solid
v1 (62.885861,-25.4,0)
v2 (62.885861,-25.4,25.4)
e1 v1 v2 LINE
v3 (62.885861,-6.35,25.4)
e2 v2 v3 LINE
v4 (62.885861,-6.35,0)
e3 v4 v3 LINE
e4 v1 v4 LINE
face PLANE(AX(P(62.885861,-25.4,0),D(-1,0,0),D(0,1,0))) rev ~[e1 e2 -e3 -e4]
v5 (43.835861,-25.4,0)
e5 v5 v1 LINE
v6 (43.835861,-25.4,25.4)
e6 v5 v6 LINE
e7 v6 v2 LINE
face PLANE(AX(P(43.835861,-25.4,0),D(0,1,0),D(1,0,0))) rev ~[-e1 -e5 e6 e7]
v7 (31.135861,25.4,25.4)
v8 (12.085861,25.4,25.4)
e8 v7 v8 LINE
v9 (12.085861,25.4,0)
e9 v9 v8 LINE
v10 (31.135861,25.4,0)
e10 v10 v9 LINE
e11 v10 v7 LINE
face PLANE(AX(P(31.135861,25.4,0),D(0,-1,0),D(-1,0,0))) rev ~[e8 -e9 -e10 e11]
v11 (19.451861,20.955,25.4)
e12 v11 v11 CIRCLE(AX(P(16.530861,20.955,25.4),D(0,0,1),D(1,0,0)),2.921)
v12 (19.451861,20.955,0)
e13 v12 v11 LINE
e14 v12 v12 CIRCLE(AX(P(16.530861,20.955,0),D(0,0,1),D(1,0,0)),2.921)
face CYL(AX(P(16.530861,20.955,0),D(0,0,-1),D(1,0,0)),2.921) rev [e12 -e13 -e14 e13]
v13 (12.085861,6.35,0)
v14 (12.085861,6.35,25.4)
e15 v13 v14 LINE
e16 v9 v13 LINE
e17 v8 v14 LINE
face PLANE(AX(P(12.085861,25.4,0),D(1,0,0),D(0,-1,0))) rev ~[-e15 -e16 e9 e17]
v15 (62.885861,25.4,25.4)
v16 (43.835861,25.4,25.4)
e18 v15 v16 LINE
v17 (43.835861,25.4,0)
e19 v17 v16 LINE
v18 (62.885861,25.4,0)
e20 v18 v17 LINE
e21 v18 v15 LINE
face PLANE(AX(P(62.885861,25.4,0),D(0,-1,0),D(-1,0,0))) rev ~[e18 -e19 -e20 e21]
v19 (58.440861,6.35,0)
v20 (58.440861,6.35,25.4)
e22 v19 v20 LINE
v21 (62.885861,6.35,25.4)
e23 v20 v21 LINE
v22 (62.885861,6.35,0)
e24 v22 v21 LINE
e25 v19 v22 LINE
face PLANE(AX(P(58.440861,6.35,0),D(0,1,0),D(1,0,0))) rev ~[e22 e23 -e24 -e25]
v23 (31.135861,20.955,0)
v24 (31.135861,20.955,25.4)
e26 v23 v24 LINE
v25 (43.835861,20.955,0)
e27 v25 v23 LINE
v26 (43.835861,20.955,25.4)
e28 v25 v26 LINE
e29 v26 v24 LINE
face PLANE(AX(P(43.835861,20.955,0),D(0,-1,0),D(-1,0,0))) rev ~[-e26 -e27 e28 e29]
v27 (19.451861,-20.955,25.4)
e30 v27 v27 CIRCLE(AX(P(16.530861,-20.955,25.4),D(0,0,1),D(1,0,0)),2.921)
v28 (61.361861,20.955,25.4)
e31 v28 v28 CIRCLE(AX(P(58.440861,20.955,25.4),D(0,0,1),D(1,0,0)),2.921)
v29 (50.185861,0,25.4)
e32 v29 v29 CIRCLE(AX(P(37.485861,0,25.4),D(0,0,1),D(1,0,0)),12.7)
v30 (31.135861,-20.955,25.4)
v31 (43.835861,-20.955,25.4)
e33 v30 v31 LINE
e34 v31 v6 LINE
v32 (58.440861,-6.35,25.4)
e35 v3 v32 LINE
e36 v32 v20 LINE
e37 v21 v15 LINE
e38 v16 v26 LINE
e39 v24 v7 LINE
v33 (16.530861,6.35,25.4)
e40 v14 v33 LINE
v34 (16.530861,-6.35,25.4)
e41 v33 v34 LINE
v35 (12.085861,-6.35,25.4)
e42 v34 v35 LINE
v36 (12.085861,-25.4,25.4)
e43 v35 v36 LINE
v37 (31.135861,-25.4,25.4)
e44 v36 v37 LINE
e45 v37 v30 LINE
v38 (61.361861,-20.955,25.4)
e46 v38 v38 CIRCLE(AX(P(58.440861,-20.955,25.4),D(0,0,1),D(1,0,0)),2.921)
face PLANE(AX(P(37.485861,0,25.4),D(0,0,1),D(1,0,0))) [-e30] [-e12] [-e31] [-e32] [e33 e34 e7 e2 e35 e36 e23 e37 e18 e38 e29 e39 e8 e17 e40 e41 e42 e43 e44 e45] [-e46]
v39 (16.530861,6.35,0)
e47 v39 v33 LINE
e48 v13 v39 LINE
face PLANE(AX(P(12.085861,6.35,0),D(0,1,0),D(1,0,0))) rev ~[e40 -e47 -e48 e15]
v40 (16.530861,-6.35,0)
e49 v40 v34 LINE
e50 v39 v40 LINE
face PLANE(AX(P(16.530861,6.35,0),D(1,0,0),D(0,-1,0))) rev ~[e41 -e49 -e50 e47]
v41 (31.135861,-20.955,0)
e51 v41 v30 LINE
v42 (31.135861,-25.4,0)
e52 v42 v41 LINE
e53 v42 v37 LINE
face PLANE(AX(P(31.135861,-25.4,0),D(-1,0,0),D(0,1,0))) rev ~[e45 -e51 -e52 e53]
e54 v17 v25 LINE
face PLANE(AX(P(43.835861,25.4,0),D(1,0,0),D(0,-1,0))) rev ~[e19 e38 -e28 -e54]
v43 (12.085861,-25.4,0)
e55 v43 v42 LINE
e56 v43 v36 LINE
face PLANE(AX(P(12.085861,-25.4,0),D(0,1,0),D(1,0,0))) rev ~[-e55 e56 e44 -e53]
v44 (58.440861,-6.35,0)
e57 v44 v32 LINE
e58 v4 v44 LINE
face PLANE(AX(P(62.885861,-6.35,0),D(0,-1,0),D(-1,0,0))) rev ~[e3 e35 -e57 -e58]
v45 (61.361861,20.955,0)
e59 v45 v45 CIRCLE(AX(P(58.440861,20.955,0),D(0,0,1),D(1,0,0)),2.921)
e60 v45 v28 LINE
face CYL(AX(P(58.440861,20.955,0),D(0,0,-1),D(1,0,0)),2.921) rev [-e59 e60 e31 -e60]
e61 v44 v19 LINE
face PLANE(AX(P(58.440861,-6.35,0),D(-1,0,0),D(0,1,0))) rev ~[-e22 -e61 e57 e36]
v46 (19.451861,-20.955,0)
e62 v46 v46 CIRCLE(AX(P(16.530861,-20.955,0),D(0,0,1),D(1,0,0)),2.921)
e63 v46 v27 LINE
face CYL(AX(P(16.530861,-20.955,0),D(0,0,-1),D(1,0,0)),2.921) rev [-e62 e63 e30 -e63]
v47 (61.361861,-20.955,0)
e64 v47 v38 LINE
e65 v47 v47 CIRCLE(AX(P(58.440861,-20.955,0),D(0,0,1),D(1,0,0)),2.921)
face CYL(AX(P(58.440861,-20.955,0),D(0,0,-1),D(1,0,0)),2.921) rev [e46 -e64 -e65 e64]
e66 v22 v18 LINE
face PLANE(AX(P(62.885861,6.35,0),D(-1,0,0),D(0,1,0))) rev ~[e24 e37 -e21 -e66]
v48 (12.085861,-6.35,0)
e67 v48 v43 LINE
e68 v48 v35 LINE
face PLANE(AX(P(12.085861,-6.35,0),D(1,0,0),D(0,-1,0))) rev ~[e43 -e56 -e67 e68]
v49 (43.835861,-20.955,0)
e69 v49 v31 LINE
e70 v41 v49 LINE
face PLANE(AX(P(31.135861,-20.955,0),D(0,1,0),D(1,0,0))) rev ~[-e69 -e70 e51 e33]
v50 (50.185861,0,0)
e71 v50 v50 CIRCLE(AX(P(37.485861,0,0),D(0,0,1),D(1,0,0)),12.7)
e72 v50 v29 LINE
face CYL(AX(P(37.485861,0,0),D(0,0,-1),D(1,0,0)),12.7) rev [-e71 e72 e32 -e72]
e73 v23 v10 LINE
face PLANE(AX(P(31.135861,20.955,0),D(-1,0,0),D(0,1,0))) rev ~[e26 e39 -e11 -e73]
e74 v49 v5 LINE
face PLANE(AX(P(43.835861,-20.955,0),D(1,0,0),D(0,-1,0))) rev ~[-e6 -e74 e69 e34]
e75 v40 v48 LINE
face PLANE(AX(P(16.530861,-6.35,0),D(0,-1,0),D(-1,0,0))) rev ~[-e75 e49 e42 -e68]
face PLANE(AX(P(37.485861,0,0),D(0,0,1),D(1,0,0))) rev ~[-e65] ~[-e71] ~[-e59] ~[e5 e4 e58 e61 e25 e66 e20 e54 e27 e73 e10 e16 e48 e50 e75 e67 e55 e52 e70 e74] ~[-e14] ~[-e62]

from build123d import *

# Parameters (mm, degrees)
F0_R     = 2.921
F0_R_2   = 12.7
F1_DEPTH = 25.4


# Not quite as in the source:
# - the program builds the solid bodies; features that only make, move or delete a surface that nothing else refers to are left out


with BuildPart() as f1:
    # F0 (on Top) → F1 (new body)
    with BuildSketch(Plane.XY):
        Polygon((31.1358614907, 25.4), (12.0858614907, 25.4), (12.0858614907, 6.35), (16.5308614907, 6.35), (16.5308614907, -6.35), (12.0858614907, -6.35), (12.0858614907, -25.4), (31.1358614907, -25.4), (31.1358614907, -20.955), (43.8358614907, -20.955), (43.8358614907, -25.4), (62.8858614907, -25.4), (62.8858614907, -6.35), (58.4408614907, -6.35), (58.4408614907, 6.35), (62.8858614907, 6.35), (62.8858614907, 25.4), (43.8358614907, 25.4), (43.8358614907, 20.955), (31.1358614907, 20.955), align=None)
        with Locations((16.5308614907, -20.955)):
            Circle(F0_R, mode=Mode.SUBTRACT)
        with Locations((37.4858614907, 0)):
            Circle(F0_R_2, mode=Mode.SUBTRACT)
        with Locations((58.4408614907, -20.955)):
            Circle(F0_R, mode=Mode.SUBTRACT)
        with Locations((16.5308614907, 20.955)):
            Circle(F0_R, mode=Mode.SUBTRACT)
        with Locations((58.4408614907, 20.955)):
            Circle(F0_R, mode=Mode.SUBTRACT)
    extrude(amount=F1_DEPTH)


solid = f1.part
